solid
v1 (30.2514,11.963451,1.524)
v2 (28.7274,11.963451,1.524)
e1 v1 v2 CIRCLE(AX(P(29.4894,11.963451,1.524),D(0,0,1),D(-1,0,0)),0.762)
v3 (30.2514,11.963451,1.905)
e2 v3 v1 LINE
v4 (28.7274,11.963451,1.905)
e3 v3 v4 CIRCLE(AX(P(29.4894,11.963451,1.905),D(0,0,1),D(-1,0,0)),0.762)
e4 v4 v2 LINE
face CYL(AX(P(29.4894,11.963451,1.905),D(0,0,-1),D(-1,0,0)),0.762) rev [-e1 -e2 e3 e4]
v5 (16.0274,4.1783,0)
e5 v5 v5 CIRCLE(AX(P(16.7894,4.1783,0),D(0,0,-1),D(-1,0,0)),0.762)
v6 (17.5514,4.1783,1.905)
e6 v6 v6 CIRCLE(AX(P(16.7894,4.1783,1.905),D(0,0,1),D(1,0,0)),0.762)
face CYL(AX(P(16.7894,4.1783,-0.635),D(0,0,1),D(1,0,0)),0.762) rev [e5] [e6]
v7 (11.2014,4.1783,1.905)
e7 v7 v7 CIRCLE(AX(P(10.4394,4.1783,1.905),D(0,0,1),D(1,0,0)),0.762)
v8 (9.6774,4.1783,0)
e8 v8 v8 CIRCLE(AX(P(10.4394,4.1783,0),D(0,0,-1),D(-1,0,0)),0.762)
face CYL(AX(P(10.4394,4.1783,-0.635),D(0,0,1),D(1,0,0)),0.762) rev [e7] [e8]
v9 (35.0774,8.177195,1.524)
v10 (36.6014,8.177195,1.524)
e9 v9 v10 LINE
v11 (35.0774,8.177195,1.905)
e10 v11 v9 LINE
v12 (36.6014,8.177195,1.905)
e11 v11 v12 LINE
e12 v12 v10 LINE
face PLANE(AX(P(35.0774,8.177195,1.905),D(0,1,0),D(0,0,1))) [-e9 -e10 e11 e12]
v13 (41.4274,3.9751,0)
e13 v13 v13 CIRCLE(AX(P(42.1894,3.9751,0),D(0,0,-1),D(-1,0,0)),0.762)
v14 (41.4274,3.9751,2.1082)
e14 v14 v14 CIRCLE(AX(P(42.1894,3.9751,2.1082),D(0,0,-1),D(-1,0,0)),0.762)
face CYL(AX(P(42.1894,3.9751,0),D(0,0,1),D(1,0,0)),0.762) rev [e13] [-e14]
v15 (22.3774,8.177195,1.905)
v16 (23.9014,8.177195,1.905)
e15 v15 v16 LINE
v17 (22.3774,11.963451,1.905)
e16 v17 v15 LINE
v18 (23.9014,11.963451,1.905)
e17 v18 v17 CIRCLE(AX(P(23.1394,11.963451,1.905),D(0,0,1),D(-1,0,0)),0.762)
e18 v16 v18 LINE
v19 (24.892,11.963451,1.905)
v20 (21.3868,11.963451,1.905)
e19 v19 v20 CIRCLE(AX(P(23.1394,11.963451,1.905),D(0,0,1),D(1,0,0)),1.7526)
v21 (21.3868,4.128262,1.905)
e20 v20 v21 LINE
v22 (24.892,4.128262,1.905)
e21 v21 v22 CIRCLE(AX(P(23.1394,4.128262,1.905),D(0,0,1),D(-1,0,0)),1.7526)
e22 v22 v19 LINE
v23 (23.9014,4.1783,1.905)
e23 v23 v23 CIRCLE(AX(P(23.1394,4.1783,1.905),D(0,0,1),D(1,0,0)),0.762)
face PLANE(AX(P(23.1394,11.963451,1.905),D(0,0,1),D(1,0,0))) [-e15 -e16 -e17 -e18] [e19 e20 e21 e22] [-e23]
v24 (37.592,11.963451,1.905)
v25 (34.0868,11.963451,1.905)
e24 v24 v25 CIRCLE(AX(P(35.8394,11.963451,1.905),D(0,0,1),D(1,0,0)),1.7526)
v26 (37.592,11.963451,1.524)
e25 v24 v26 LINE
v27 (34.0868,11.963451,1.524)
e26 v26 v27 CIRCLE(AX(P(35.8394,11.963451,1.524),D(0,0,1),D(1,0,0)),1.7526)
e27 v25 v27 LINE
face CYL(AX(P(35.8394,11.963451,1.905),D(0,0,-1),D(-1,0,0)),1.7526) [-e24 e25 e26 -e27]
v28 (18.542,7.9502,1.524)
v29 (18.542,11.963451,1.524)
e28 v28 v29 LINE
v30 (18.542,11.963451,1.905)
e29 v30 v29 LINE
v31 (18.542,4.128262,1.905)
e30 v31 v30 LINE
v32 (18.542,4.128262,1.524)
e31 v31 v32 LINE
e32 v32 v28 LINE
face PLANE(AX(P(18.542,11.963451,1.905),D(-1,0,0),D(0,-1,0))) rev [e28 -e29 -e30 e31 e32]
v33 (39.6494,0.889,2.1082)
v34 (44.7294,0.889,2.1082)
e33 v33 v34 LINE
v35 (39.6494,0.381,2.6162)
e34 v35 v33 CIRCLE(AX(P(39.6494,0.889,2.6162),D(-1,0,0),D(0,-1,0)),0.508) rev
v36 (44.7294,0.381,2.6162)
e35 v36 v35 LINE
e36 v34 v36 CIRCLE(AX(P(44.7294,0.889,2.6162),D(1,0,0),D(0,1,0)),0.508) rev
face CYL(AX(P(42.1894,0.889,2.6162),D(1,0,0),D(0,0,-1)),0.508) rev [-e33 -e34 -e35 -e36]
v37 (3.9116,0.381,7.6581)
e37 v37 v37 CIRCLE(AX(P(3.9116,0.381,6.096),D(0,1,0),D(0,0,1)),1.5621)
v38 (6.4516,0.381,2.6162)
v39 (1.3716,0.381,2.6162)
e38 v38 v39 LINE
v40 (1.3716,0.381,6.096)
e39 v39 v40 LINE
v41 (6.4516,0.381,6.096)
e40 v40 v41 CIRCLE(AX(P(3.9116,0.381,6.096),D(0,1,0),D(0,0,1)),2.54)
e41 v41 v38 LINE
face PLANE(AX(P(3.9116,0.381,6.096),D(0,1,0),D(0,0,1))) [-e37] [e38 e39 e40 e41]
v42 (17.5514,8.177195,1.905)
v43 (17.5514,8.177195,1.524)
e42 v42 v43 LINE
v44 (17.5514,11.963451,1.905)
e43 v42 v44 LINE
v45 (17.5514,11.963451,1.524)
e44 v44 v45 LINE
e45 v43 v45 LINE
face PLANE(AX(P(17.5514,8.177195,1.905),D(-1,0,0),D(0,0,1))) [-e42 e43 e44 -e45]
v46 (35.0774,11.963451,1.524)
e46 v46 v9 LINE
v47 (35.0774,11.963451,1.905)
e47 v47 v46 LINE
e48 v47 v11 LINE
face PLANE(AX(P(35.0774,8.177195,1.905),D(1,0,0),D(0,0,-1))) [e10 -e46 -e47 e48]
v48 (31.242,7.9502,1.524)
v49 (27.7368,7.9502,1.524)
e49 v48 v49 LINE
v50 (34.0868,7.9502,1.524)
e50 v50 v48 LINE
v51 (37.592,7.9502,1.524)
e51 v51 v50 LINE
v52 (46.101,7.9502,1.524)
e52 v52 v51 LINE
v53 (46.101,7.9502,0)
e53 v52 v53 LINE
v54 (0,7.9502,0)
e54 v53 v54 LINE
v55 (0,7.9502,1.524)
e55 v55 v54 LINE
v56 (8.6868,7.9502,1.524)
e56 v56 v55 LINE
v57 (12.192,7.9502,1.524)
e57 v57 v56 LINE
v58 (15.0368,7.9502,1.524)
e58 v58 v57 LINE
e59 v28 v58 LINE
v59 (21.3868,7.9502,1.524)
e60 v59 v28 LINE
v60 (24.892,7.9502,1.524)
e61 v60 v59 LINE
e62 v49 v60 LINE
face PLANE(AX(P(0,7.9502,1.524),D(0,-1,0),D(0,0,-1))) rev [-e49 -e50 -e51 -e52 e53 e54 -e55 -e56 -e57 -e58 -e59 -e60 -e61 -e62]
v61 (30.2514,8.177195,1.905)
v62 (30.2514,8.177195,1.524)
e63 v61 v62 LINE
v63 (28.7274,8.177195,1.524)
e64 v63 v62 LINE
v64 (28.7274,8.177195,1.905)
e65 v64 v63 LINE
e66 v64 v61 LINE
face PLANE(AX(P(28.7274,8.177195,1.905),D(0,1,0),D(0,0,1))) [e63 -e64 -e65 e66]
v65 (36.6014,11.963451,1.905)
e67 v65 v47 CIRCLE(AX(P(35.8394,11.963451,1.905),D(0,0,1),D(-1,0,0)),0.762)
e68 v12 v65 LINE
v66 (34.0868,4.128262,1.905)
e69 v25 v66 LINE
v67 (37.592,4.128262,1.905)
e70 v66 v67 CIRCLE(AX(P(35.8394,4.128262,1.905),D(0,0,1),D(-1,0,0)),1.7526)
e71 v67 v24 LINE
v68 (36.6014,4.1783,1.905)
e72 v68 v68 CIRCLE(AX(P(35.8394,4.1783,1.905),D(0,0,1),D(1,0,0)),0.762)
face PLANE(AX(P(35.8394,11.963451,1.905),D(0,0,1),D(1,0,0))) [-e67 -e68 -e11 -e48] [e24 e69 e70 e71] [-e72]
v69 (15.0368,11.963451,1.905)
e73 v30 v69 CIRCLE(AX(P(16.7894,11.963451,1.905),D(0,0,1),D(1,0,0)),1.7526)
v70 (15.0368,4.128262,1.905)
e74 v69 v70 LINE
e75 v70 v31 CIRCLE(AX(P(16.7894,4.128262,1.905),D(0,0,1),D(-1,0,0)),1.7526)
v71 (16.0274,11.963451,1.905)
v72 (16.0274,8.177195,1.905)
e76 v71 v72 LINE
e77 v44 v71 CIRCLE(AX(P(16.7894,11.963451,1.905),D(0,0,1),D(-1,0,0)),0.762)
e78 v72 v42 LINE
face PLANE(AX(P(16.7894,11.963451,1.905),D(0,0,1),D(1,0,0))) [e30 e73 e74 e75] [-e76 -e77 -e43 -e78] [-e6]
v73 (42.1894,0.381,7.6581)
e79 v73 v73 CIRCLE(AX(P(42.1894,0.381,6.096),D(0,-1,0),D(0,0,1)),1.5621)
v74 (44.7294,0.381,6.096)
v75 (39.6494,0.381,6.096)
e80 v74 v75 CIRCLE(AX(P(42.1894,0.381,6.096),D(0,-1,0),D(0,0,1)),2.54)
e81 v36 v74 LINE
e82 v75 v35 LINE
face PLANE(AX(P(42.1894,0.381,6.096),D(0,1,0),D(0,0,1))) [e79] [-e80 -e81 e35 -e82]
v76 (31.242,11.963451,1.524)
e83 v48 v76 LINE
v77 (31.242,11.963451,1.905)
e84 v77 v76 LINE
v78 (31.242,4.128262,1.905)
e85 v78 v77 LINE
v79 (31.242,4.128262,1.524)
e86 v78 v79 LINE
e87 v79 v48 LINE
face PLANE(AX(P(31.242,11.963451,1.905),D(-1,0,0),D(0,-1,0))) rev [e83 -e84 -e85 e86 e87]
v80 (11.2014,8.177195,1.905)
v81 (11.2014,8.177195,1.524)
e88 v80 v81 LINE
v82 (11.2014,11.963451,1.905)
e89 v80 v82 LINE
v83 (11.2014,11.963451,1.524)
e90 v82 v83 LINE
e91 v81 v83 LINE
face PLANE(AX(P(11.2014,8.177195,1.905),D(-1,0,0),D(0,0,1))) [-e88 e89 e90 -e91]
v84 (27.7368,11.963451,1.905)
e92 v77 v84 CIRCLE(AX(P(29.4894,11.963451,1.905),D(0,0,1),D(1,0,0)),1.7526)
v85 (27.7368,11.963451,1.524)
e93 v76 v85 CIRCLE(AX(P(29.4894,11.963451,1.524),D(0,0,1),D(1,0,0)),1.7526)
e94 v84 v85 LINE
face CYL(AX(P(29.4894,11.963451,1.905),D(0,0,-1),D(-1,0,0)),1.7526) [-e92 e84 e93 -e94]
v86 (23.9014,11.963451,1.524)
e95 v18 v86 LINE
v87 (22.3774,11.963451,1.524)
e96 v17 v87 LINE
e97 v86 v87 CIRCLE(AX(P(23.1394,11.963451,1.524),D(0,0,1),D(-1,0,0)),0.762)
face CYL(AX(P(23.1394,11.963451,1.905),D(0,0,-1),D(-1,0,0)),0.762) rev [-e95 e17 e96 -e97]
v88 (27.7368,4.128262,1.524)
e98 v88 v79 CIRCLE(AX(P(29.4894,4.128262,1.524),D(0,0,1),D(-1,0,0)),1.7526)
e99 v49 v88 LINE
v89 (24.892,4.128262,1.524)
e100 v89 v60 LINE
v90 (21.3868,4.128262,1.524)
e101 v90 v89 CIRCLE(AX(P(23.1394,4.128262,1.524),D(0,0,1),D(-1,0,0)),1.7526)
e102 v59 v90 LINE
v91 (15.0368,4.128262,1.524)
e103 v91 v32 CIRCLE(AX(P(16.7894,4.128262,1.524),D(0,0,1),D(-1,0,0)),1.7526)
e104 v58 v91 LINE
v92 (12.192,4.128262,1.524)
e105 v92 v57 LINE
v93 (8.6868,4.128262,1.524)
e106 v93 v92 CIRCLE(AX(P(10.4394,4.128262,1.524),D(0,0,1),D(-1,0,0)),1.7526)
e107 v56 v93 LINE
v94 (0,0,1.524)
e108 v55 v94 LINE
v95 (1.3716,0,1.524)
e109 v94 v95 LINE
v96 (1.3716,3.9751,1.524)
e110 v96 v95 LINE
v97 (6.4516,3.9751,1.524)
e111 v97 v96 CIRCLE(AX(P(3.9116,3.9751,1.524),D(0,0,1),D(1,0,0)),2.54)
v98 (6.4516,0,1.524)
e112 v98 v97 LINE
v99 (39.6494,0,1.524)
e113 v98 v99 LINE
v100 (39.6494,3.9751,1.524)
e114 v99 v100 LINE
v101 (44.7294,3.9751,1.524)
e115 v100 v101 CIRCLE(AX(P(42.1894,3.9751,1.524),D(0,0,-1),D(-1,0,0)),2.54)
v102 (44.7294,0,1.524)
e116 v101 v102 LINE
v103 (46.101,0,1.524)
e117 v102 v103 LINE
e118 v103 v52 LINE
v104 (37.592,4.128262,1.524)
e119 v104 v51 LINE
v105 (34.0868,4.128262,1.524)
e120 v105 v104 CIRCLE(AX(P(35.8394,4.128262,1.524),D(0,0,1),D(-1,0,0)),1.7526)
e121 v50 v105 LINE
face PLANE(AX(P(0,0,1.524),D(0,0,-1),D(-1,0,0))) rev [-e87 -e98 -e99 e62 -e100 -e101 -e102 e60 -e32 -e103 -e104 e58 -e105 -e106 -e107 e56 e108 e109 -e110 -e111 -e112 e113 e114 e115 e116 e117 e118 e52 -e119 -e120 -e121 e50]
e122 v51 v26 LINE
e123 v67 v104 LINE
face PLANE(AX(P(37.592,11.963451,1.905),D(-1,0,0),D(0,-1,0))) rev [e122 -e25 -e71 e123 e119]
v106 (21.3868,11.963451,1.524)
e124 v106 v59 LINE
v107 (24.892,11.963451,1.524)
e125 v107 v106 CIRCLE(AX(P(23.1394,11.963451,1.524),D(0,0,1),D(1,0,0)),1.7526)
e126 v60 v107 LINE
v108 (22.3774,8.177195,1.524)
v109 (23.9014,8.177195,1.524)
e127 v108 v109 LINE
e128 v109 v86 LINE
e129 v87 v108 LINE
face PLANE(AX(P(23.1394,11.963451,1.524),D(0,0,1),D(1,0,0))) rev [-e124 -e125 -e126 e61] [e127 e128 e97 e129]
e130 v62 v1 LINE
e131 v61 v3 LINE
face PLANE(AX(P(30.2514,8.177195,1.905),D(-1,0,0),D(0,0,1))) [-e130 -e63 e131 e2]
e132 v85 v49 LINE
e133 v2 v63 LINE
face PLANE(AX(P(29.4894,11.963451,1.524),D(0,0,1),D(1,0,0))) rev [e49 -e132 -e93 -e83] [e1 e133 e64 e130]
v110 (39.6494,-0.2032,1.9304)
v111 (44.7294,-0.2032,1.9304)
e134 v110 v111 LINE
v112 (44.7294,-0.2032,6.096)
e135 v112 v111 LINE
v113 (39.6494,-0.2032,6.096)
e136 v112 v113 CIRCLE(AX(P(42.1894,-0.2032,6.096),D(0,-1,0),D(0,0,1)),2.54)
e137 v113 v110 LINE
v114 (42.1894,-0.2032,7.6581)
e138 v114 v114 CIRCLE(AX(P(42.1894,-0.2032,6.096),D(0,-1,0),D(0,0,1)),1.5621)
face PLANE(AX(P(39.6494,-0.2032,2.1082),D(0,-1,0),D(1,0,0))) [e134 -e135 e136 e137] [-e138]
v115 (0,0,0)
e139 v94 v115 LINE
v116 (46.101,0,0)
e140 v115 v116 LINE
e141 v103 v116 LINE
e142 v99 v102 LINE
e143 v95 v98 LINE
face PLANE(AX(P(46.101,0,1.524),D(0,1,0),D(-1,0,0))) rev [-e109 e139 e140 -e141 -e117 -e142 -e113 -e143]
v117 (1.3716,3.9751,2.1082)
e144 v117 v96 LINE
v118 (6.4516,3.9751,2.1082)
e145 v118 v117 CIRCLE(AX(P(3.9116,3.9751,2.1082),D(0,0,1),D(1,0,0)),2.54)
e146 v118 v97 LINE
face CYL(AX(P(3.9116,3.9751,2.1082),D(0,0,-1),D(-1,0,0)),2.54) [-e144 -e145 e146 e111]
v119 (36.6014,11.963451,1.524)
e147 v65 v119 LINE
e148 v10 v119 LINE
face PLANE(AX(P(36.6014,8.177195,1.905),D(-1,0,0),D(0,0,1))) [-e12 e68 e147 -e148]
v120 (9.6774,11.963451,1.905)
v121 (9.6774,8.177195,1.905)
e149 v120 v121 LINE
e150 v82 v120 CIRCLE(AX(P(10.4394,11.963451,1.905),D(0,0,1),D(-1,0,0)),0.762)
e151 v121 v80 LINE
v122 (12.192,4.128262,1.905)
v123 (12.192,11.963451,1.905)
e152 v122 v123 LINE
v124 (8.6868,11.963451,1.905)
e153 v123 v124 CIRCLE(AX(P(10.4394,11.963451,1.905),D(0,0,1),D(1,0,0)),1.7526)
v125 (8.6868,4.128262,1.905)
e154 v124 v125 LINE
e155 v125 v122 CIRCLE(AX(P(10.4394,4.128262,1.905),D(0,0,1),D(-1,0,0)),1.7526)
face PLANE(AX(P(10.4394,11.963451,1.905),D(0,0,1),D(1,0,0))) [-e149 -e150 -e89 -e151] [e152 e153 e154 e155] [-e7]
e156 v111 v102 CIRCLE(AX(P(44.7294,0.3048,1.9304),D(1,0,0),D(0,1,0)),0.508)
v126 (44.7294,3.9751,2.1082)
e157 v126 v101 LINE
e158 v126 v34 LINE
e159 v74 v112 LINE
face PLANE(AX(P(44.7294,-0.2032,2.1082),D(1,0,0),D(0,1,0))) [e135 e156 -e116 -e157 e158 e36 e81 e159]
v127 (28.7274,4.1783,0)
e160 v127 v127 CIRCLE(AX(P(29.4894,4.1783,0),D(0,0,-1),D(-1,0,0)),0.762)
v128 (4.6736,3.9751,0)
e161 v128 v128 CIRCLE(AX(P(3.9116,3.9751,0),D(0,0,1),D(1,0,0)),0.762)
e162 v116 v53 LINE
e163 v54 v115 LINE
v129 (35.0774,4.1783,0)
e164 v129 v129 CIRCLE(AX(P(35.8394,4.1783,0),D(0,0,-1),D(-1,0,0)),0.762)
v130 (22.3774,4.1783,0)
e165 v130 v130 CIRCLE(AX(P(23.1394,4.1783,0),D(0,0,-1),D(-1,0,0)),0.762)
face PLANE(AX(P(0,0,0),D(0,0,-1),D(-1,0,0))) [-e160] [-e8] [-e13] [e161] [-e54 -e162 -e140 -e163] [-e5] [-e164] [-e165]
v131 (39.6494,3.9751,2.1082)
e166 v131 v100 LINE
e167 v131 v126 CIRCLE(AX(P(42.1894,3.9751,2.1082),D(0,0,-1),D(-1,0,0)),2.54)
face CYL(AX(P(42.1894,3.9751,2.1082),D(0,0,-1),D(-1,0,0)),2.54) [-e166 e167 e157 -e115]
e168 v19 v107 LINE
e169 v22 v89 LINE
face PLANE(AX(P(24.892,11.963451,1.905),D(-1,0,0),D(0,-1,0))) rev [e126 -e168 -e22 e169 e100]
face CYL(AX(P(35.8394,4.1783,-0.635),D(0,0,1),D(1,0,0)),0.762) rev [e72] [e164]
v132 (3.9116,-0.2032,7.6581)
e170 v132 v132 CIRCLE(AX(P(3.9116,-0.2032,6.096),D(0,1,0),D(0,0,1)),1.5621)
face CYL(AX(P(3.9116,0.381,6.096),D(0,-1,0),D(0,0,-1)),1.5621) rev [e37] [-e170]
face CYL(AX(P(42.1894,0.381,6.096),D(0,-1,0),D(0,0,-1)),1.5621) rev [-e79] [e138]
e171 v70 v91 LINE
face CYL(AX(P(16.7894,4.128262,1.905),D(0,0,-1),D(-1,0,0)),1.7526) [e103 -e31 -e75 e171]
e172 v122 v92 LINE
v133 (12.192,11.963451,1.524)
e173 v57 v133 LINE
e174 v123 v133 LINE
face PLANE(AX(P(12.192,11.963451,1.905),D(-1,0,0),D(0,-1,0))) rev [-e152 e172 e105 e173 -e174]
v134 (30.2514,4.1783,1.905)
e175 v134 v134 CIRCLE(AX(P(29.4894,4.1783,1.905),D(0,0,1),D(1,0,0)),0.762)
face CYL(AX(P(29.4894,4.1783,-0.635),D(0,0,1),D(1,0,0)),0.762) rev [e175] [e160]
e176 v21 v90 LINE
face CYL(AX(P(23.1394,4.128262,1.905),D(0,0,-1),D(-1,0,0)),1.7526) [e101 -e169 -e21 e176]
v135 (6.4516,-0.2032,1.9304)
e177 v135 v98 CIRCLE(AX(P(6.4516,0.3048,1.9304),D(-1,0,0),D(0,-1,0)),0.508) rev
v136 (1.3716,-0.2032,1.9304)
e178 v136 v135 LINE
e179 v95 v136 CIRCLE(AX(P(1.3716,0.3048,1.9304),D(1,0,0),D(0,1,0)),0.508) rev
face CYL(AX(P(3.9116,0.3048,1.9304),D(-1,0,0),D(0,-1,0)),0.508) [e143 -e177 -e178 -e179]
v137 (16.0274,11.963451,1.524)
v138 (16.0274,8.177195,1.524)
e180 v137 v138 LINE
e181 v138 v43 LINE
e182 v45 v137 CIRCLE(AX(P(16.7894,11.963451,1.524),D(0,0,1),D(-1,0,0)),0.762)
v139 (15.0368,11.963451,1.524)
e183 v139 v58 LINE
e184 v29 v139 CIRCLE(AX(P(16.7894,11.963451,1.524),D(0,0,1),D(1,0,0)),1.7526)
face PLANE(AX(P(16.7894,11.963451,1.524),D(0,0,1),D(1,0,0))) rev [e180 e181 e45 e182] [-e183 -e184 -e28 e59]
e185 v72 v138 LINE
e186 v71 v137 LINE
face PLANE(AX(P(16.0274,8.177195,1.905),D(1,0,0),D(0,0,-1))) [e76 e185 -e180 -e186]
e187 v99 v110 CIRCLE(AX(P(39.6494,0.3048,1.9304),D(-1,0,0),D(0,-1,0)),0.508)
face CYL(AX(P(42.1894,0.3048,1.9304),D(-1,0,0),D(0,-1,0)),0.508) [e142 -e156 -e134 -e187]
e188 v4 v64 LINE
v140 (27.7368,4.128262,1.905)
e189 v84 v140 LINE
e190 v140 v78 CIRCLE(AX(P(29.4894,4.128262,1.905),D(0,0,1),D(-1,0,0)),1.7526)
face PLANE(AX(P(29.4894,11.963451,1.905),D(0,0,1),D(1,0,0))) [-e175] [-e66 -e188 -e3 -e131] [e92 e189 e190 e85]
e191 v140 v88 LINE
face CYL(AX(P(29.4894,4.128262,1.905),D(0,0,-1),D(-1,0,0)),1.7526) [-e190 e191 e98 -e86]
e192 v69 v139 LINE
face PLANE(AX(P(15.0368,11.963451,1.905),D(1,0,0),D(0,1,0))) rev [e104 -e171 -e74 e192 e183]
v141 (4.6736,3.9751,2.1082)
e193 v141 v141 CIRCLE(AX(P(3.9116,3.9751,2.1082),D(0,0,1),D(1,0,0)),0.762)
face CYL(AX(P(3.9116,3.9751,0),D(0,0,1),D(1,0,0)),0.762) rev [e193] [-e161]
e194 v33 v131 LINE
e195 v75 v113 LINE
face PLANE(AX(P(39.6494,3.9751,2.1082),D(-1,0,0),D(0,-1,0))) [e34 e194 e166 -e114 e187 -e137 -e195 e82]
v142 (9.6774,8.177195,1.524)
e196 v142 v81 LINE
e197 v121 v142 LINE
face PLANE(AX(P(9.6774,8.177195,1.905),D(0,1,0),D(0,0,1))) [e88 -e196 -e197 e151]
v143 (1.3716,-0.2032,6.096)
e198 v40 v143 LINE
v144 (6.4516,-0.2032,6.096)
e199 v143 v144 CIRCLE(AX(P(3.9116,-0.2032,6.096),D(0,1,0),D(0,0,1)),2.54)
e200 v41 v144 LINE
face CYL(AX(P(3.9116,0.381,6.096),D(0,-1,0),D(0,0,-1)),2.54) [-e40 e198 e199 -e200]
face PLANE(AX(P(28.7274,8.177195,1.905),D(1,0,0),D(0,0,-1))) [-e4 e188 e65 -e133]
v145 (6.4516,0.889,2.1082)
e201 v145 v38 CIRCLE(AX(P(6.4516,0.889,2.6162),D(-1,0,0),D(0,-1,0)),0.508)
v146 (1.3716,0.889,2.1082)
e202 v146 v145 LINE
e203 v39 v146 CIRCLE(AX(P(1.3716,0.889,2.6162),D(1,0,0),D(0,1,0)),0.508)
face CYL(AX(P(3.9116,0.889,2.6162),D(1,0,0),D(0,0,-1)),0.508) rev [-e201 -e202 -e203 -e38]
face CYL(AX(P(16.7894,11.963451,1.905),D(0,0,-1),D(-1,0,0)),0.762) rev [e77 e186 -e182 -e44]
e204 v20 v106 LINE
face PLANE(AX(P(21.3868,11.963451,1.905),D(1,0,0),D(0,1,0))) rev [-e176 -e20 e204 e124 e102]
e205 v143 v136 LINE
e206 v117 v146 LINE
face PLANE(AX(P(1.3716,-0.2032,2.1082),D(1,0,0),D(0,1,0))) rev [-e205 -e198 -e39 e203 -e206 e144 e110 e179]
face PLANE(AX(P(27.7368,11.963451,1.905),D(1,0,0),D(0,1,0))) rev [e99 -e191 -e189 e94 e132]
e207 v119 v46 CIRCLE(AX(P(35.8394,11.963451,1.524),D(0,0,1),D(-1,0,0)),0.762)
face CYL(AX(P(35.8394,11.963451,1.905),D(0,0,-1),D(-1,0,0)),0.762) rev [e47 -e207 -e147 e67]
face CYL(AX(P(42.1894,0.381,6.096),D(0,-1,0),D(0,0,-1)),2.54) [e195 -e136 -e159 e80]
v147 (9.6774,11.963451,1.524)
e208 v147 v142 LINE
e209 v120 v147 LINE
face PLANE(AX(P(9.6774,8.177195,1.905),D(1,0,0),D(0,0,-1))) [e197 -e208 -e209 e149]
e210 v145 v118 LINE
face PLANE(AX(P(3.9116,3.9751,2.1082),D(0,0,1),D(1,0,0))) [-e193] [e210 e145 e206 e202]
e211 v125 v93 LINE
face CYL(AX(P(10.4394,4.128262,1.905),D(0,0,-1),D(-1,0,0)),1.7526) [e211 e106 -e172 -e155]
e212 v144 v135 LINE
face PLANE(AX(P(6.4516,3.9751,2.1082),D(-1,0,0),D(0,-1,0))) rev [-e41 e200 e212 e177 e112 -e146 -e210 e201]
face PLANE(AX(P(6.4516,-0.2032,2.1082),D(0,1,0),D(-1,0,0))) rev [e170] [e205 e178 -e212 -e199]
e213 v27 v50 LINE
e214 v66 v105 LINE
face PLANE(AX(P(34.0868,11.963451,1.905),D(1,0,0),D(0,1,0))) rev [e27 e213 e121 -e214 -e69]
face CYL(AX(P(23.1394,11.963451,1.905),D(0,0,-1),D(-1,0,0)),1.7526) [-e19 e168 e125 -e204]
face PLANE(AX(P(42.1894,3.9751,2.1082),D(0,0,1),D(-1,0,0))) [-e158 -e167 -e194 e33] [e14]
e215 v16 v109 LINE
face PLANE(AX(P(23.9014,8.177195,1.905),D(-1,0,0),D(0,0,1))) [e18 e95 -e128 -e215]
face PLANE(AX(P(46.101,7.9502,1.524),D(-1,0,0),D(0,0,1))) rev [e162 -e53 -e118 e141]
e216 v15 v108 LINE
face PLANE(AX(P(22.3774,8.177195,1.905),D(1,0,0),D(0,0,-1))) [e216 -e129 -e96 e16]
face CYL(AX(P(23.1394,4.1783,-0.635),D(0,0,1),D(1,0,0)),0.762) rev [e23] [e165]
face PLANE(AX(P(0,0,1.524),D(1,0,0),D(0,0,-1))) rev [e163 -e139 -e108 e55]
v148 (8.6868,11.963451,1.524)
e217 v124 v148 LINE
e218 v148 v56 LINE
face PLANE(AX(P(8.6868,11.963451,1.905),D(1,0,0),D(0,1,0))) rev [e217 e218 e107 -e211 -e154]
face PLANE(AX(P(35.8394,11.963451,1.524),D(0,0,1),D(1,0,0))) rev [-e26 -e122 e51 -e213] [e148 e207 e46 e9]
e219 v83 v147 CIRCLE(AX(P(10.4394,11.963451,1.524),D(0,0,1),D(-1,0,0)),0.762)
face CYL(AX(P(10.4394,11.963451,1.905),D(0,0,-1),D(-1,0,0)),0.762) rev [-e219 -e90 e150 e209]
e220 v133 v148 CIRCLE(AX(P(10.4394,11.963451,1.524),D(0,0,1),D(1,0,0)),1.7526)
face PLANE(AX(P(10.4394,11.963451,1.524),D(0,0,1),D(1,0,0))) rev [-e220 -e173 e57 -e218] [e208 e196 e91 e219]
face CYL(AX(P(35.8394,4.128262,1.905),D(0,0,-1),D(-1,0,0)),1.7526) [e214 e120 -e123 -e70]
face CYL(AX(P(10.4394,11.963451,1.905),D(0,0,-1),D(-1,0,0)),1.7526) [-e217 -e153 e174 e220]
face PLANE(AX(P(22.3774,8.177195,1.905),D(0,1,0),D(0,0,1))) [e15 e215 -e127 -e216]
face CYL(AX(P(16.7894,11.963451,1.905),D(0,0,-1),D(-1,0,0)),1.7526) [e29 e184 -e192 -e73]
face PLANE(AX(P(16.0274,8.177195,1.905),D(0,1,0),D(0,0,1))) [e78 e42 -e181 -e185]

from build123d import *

# Parameters (mm, degrees)
SKETCH1_W           = 46.101
SKETCH1_H           = 7.9502
BASE_EXTRUDE_DEPTH  = 1.524
BOSS_EXTRUDE1_DEPTH = 0.5842
SKETCH3_R           = 1.5621
BOSS_EXTRUDE2_DEPTH = 0.5842
FILLET1_R           = 0.508
SKETCH4_R           = 0.762
CUT_EXTRUDE1_DEPTH  = 48.234733554
MIRROR1_START       = -1
MIRROR1_OUTLINE_R   = 0.762
MIRROR1_DEPTH       = 2.524
MIRROR1_START_2     = 1.524
MIRROR1_2_OUTLINE_R = 0.762
MIRROR1_2_DEPTH     = 0.5842
MIRROR1_START_3     = 1.9304
MIRROR1_3_OUTLINE_W = 5.08
MIRROR1_3_OUTLINE_H = 0.5842
MIRROR1_3_DEPTH     = 2.6034999
MIRROR1_START_4     = 39.6494
MIRROR1_4_DEPTH     = 5.08
MIRROR1_START_5     = -0.2032
MIRROR1_5_OUTLINE_R = 1.5621
MIRROR1_5_DEPTH     = 0.5842
BOSS_EXTRUDE3_DEPTH = 0.381
SKETCH6_R           = 0.762
CUT_EXTRUDE2_DEPTH  = 2.54
LPATTERN1_COUNT     = 5
LPATTERN1_PITCH     = 6.35


with BuildPart() as part:
    # Sketch1 → Base-Extrude (new body)
    with BuildSketch(Plane.XY):
        with Locations((23.0505, 3.9751)):
            Rectangle(SKETCH1_W, SKETCH1_H)
    extrude(amount=BASE_EXTRUDE_DEPTH)

    # Sketch2 → Boss-Extrude1 (add)
    with BuildSketch(Plane.XY.offset(1.524)):
        with BuildLine():
            Line((6.4516, 3.9751), (6.4516, -0.2032))
            Line((6.4516, -0.2032), (1.3716, -0.2032))
            Line((1.3716, -0.2032), (1.3716, 3.9751))
            ThreePointArc((1.3716, 3.9751), (3.9116, 6.5151), (6.4516, 3.9751))
        make_face()
    extrude(amount=BOSS_EXTRUDE1_DEPTH)

    # Sketch3 → Boss-Extrude2 (add)
    with BuildSketch(Plane(origin=(0, -0.2032, 0), x_dir=(-1, 0, 0), z_dir=(0, 1, 0))):
        with BuildLine():
            Line((-1.3716, 6.096), (-1.3716, 1.524))
            Line((-1.3716, 1.524), (-6.4516, 1.524))
            Line((-6.4516, 1.524), (-6.4516, 6.096))
            ThreePointArc((-6.4516, 6.096), (-3.9116, 8.636), (-1.3716, 6.096))
        make_face()
        with Locations(Location((-3.9116, 6.096, 0), (0, 0, 90))):
            Circle(SKETCH3_R, mode=Mode.SUBTRACT)
    extrude(amount=BOSS_EXTRUDE2_DEPTH)

    # Fillet1
    # the kernel refuses this fillet: 0.508 mm, written as the material it adds along each edge
    with BuildSketch(Plane(origin=(6.4516, 0.381, 2.1082), x_dir=(0, 1, 0), z_dir=(-1, 0, 0))) as fillet1_piece_1:
        with BuildLine():
            CenterArc((FILLET1_R, -FILLET1_R), FILLET1_R, 90, 90)
            Line((0, -FILLET1_R), (0, 0))
            Line((0, 0), (FILLET1_R, 0))
        make_face()
    extrude(amount=5.08)
    # the kernel refuses this fillet: 0.508 mm, written as the material it takes off along each edge
    with BuildSketch(Plane(origin=(7.4676, -0.2032, 1.524), x_dir=(0, 1.0, 2.6098982991759982e-11), z_dir=(-1, 0, 0))) as fillet1_2_piece_1:
        with BuildLine():
            CenterArc((0.508, -0.4064), FILLET1_R, 126.869897647, 53.130102355)
            Line((0, -0.4064), (0, 0))
            Line((0, 0), (0.2032, 0))
        make_face()
    extrude(amount=7.112, mode=Mode.SUBTRACT)

    # Sketch4 → Cut-Extrude1 (cut, through all)
    with BuildSketch(Plane.XY.offset(2.1082)):
        with Locations((3.9116, 3.9751)):
            Circle(SKETCH4_R)
    extrude(amount=-CUT_EXTRUDE1_DEPTH, mode=Mode.SUBTRACT)

    # Mirror1: read off the stored shape, not the designer's step
    # Mirror1 outline → Mirror1 (cut)
    with BuildSketch(Plane.XY.offset(MIRROR1_START)):
        with Locations((42.1894, 3.9751)):
            Circle(MIRROR1_OUTLINE_R)
    extrude(amount=MIRROR1_DEPTH, mode=Mode.SUBTRACT)

    # Mirror1 2 outline → Mirror1 2 (add)
    with BuildSketch(Plane.XY.offset(MIRROR1_START_2)):
        with BuildLine():
            Line((39.6494, 3.9751), (39.6494, 0.381))
            Line((39.6494, 0.381), (44.7294, 0.381))
            Line((44.7294, 0.381), (44.7294, 3.9751))
            ThreePointArc((44.7294, 3.9751), (42.1894, 6.5151), (39.6494, 3.9751))
        make_face()
        with Locations((42.1894, 3.9751)):
            Circle(MIRROR1_2_OUTLINE_R, mode=Mode.SUBTRACT)
    extrude(amount=MIRROR1_2_DEPTH)

    # Mirror1 3 outline → Mirror1 3 (add)
    with BuildSketch(Plane.XY.offset(MIRROR1_START_3)):
        with Locations((42.1894, 0.0889)):
            Rectangle(MIRROR1_3_OUTLINE_W, MIRROR1_3_OUTLINE_H)
    extrude(amount=MIRROR1_3_DEPTH)

    # Mirror1 4 outline → Mirror1 4 (add)
    with BuildSketch(Plane.YZ.offset(MIRROR1_START_4)):
        with BuildLine():
            Line((0.381, 1.9304), (-0.2032, 1.9304))
            ThreePointArc((-0.2032, 1.9304), (-0.149569013, 1.703215493), (0, 1.524))
            Line((0, 1.524), (0.381, 1.524))
            Line((0.381, 1.524), (0.381, 1.9304))
        make_face()
        with BuildLine():
            ThreePointArc((0.889, 2.1082), (0.529789755, 2.256989755), (0.381, 2.6162))
            Line((0.381, 2.6162), (0.381, 2.1082))
            Line((0.381, 2.1082), (0.889, 2.1082))
        make_face()
    extrude(amount=MIRROR1_4_DEPTH)

    # Mirror1 5 outline → Mirror1 5 (add)
    with BuildSketch(Plane(origin=(0, 0, 0), x_dir=(1, 0, 0), z_dir=(0, 1, 0)).offset(MIRROR1_START_5)):
        with BuildLine():
            Line((39.6494, -2.6162), (39.6494, -6.096))
            ThreePointArc((39.6494, -6.096), (42.1894, -8.636), (44.7294, -6.096))
            Line((44.7294, -6.096), (44.7294, -2.6162))
            Line((44.7294, -2.6162), (39.6494, -2.6162))
        make_face()
        with Locations((42.1894, -6.096)):
            Circle(MIRROR1_5_OUTLINE_R, mode=Mode.SUBTRACT)
    extrude(amount=MIRROR1_5_DEPTH)

    # Sketch5 → Boss-Extrude3 (add)
    with BuildSketch(Plane.XY.offset(1.524)):
        with BuildLine():
            Line((37.592, 11.9634508), (37.592, 4.128262))
            ThreePointArc((37.592, 4.128262), (35.8394, 2.375662), (34.0868, 4.128262))
            Line((34.0868, 4.128262), (34.0868, 11.9634508))
            ThreePointArc((34.0868, 11.9634508), (35.8394, 13.7160508), (37.592, 11.9634508))
        make_face()
        with BuildLine():
            Line((35.0774, 8.177194519), (36.6014, 8.177194519))
            Line((36.6014, 8.177194519), (36.6014, 11.9634508))
            ThreePointArc((36.6014, 11.9634508), (35.8394, 12.7254508), (35.0774, 11.9634508))
            Line((35.0774, 11.9634508), (35.0774, 8.177194519))
        make_face(mode=Mode.SUBTRACT)
    boss_extrude3 = extrude(amount=BOSS_EXTRUDE3_DEPTH)

    # Sketch6 → Cut-Extrude2 (cut)
    with BuildSketch(Plane.XY.offset(1.905)):
        with Locations((35.8394, 4.1783)):
            Circle(SKETCH6_R)
    cut_extrude2 = extrude(amount=-CUT_EXTRUDE2_DEPTH, mode=Mode.SUBTRACT)

    # LPattern1: Boss-Extrude3, Cut-Extrude2 ×5
    with Locations(*[(-i * LPATTERN1_PITCH, 0, 0) for i in range(1, LPATTERN1_COUNT)]):
        add(boss_extrude3)
        add(cut_extrude2, mode=Mode.SUBTRACT)


solid = part.part
